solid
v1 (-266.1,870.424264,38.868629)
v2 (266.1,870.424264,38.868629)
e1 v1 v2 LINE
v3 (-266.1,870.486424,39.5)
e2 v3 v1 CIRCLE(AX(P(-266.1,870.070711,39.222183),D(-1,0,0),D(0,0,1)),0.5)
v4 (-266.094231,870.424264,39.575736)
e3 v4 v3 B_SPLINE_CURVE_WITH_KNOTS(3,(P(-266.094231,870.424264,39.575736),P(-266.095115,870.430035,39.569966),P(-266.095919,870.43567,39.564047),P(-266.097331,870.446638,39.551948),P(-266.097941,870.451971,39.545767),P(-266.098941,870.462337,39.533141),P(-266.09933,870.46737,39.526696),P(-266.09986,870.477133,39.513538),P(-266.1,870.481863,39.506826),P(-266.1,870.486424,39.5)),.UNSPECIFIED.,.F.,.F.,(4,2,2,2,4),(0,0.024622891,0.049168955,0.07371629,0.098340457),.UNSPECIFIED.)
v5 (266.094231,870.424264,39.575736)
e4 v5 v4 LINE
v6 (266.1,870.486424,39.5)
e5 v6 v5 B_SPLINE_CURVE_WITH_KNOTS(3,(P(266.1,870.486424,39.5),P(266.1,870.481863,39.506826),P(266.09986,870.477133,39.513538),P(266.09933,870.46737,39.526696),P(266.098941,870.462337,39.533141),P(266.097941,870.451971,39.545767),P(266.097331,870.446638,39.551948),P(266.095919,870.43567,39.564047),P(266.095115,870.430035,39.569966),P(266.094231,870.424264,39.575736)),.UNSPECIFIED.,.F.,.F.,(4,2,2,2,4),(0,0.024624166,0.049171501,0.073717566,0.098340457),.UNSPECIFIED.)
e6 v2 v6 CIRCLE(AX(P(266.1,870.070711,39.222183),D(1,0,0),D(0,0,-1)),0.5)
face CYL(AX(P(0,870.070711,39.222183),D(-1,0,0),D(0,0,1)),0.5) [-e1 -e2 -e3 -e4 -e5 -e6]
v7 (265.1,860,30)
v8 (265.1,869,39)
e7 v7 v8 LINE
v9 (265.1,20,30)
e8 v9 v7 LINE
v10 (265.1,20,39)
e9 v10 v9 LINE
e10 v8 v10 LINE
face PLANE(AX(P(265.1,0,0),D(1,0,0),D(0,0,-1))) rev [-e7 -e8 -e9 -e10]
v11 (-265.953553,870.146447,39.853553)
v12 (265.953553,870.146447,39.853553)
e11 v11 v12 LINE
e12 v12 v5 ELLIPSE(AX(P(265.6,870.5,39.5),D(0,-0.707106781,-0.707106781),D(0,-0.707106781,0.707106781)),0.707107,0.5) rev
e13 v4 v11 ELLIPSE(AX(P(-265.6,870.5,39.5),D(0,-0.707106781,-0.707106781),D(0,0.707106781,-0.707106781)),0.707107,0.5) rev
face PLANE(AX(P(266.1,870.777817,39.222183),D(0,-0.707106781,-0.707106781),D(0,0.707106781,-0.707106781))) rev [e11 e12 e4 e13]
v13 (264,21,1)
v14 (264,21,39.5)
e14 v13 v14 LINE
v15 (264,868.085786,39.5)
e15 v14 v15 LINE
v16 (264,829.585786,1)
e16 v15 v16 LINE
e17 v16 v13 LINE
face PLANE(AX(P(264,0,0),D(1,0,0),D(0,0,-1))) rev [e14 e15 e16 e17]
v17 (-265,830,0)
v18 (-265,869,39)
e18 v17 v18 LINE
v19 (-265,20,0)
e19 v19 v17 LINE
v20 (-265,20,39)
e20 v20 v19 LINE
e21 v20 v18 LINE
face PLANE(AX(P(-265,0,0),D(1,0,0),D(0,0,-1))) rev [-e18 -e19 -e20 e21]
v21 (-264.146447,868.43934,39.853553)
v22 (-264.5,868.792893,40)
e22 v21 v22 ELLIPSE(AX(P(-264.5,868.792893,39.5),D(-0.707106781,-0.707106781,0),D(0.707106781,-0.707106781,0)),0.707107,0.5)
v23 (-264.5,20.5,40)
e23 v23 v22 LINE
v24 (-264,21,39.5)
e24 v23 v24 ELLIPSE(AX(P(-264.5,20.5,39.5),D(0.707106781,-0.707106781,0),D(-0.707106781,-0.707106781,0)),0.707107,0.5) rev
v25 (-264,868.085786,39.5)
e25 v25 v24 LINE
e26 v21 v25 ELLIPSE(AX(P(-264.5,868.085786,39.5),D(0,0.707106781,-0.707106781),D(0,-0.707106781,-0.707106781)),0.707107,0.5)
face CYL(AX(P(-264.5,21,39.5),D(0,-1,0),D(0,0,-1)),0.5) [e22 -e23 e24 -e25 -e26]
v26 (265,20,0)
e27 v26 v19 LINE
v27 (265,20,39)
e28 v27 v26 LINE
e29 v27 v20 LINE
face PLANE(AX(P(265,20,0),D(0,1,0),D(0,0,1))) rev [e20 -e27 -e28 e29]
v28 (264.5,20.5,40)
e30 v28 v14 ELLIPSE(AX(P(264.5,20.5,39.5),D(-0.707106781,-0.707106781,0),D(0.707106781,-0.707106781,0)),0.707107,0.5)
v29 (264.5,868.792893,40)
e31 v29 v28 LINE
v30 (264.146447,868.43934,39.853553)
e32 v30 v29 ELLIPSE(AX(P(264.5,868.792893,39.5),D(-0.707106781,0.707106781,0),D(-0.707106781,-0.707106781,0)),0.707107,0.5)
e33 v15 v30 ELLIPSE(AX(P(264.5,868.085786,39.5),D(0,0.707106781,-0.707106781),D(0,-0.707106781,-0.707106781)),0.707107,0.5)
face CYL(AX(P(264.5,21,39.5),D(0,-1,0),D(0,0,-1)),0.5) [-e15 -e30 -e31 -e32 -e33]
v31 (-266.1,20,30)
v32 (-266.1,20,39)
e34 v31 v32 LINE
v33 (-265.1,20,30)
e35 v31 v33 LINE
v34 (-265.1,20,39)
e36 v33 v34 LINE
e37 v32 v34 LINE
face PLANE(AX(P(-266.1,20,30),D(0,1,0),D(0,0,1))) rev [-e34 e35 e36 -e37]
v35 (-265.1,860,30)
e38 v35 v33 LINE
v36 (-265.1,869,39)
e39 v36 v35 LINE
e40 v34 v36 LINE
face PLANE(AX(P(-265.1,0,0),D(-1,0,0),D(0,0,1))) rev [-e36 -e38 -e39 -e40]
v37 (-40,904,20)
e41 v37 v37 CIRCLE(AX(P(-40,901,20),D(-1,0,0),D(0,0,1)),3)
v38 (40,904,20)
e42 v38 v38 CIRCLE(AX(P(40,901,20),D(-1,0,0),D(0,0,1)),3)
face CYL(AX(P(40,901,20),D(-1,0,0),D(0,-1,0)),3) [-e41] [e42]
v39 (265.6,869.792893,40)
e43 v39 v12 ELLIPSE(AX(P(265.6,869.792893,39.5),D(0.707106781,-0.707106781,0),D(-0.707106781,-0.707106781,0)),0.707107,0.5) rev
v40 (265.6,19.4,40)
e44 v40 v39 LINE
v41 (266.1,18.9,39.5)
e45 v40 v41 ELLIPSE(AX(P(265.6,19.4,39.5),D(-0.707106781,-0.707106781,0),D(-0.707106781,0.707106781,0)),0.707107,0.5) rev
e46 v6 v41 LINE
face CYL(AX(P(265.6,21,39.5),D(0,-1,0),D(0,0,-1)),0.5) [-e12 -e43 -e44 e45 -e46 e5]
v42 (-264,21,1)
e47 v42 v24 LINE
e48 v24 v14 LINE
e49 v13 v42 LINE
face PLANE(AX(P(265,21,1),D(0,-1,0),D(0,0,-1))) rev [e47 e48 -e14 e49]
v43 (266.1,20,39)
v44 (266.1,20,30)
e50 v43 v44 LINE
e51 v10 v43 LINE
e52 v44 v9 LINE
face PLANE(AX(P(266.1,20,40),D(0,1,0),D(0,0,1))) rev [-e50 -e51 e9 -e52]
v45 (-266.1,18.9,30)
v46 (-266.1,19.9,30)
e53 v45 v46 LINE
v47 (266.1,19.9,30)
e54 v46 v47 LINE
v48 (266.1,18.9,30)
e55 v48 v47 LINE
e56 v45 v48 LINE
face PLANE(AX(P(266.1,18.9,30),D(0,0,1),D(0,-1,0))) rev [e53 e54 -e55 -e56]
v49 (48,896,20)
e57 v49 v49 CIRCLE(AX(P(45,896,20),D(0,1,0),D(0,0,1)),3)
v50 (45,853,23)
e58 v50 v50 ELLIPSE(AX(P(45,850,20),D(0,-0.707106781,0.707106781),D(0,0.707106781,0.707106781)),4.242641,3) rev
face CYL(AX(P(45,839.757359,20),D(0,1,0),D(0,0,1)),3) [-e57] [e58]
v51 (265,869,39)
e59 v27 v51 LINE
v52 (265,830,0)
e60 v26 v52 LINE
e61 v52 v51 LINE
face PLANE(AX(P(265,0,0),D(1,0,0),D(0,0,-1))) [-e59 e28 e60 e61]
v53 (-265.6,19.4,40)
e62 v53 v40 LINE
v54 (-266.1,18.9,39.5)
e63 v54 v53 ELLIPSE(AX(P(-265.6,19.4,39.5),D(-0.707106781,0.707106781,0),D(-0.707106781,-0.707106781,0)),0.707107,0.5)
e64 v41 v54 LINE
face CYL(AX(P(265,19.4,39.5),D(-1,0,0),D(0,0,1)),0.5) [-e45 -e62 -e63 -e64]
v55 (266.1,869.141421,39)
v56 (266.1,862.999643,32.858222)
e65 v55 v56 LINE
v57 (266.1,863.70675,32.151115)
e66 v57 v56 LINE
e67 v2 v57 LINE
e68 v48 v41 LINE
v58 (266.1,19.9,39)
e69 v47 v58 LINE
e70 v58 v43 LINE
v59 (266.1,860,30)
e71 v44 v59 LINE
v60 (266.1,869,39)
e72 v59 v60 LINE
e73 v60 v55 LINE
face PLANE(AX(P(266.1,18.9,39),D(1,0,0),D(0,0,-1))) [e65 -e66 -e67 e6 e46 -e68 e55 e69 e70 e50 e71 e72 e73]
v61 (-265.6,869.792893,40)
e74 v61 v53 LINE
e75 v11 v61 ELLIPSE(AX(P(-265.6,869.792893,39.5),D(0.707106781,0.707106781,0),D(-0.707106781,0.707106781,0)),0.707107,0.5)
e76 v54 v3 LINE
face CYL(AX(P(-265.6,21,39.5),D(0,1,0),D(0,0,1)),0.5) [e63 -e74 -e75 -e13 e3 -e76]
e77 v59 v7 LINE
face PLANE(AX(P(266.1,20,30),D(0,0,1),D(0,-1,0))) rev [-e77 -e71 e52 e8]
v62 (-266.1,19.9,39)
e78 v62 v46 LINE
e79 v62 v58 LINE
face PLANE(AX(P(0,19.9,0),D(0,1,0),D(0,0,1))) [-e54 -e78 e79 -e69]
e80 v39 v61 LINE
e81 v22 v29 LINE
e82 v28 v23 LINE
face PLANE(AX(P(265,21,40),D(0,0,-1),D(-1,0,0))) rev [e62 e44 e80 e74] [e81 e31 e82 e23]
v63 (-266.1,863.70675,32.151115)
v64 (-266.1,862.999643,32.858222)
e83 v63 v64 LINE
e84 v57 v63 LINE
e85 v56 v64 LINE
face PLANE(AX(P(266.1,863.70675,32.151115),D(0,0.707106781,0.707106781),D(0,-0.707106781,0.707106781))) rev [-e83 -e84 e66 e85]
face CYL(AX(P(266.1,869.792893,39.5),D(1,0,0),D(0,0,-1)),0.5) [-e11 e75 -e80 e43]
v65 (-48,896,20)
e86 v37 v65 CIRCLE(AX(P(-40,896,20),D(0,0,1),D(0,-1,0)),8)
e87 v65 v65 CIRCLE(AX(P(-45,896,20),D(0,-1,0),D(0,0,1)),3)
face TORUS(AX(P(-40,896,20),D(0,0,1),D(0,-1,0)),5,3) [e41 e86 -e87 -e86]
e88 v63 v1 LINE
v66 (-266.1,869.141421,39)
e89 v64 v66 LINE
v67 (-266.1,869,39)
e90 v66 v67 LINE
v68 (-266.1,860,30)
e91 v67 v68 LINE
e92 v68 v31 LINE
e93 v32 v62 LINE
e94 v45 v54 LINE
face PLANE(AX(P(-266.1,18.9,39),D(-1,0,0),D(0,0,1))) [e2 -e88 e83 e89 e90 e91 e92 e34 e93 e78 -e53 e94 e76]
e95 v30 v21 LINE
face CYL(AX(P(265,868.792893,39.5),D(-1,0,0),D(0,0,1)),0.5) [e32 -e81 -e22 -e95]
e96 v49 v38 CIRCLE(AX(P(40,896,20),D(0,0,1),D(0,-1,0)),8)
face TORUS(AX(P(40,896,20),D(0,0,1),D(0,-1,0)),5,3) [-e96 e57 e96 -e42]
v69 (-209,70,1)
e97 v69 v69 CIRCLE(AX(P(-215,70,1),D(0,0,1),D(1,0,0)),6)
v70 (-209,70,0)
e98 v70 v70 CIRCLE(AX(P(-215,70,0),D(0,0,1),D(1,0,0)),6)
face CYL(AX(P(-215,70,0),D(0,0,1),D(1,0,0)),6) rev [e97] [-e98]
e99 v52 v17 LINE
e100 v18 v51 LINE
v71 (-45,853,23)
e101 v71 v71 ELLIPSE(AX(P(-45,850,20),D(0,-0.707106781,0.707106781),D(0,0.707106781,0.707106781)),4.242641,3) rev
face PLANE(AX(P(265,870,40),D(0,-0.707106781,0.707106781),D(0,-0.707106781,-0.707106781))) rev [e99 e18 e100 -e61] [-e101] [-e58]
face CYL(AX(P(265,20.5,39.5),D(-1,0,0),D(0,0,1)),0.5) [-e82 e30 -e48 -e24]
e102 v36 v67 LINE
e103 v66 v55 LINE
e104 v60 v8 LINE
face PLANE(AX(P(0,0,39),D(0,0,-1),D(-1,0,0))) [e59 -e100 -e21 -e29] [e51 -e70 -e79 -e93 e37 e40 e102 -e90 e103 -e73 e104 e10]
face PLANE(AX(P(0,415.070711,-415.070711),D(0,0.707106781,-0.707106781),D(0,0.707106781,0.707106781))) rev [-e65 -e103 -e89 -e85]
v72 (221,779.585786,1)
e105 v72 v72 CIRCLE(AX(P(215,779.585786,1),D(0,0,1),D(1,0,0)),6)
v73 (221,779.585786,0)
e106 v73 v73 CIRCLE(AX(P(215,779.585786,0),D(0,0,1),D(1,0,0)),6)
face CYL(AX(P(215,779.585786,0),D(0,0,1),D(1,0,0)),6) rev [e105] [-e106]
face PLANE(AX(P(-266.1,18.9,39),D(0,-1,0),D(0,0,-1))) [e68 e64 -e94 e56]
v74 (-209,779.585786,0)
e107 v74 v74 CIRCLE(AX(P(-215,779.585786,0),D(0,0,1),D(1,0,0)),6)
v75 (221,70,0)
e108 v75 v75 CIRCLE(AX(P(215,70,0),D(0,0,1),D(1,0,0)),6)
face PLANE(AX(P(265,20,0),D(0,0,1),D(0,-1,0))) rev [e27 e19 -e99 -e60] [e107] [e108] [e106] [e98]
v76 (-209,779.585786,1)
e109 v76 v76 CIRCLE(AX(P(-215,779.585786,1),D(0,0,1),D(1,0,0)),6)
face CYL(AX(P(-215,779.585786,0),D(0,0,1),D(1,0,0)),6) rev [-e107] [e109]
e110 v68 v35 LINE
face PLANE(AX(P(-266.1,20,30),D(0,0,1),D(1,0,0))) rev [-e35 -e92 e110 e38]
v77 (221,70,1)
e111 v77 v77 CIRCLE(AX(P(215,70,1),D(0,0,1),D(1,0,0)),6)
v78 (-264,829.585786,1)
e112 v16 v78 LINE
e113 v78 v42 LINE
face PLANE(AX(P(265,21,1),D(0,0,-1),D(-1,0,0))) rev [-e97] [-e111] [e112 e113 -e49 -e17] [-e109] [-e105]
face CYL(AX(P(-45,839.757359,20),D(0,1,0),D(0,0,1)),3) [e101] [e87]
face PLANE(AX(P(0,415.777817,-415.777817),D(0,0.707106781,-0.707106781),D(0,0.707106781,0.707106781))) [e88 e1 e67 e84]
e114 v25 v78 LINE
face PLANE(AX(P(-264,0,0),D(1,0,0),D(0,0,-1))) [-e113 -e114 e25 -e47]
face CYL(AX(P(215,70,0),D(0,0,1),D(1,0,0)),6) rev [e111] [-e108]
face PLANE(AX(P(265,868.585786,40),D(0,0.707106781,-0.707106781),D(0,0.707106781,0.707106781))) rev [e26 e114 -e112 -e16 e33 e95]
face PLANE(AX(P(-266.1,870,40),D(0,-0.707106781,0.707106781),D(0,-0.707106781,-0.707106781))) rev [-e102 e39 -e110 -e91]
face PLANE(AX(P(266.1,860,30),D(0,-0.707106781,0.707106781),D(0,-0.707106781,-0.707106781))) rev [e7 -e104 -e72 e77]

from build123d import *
from build123d.topology import SkipClean

# Parameters (mm, degrees)
BOSS_EXTRUDE1_DEPTH  = 265
BOSS_EXTRUDE2_DEPTH  = 1
BOSS_EXTRUDE3_DEPTH  = 1
SKETCH5_R            = 6
CUT_EXTRUDE1_DEPTH   = 1
BOSS_EXTRUDE5_REACH  = 913.299
SKETCH6_R            = 3
SKETCH10_R           = 3
BOSS_EXTRUDE7_DEPTH  = 1
BOSS_EXTRUDE8_DEPTH  = 1
SKETCH16_W           = 532.2
SKETCH16_H           = 10
BOSS_EXTRUDE9_DEPTH  = 1
SKETCH18_W           = 532.2
SKETCH18_H           = 10
BOSS_EXTRUDE10_DEPTH = 1
SKETCH19_W           = 532.2
SKETCH19_H           = 851.170710678
SKETCH19_W_2         = 528
SKETCH19_H_2         = 847.585786438
BOSS_EXTRUDE11_DEPTH = 1
CUT_EXTRUDE2_DEPTH   = 532.2
FILLET1_R            = 0.5
FILLET2_START        = -267
FILLET2_DEPTH        = 534


with BuildPart() as part:
    # Sketch2 → Boss-Extrude1 (new, symmetric)
    with BuildSketch(Plane(origin=(0, 0, 0), x_dir=(0, 0, -1), z_dir=(1, 0, 0))):
        Polygon((0, 20), (-40, 20), (-40, 21), (-1, 21), (-1, 829.585786438), (-40, 868.585786438), (-40, 870), (0, 830), align=None)
    extrude(amount=BOSS_EXTRUDE1_DEPTH, both=True)

    # Sketch3 → Boss-Extrude2 (add)
    with BuildSketch(Plane(origin=(265, 0, 0), x_dir=(0, 0, -1), z_dir=(1, 0, 0))):
        Polygon((-40, 870), (0, 830), (0, 20), (-40, 20), align=None)
    extrude(amount=-BOSS_EXTRUDE2_DEPTH)

    # Sketch4 → Boss-Extrude3 (add)
    with BuildSketch(Plane.ZY.offset(265)):
        Polygon((40, 870), (0, 830), (0, 20), (40, 20), align=None)
    extrude(amount=-BOSS_EXTRUDE3_DEPTH)

    # Sketch5 → Cut-Extrude1 (cut)
    with BuildSketch(Plane.XY.offset(1)):
        with Locations((215, 779.585786438)):
            Circle(SKETCH5_R)
        with Locations((215, 70)):
            Circle(SKETCH5_R)
        with Locations((-215, 779.585786438)):
            Circle(SKETCH5_R)
        with Locations((-215, 70)):
            Circle(SKETCH5_R)
    extrude(amount=-CUT_EXTRUDE1_DEPTH, mode=Mode.SUBTRACT)

    # Boss-Extrude5: up to this plane
    boss_extrude5_end = Plane(origin=(265, 870, 40), z_dir=(0, -0.7071067811865444, 0.7071067811865508))
    # Sketch6 → Boss-Extrude5 (add, up to the surface)
    with BuildSketch(Plane(origin=(0, 891, 0), x_dir=(1, 0, 0), z_dir=(0, 1, 0)), mode=Mode.PRIVATE) as boss_extrude5_sk1:
        with Locations(Location((-45, -20, 0), (0, 0, 270))):
            Circle(SKETCH6_R)
    boss_extrude5_tool1 = split(extrude(boss_extrude5_sk1.sketch, amount=-BOSS_EXTRUDE5_REACH, mode=Mode.PRIVATE), bisect_by=boss_extrude5_end, keep=Keep.BOTH, mode=Mode.PRIVATE)
    add(boss_extrude5_tool1.solids().sort_by_distance((-45, 891, 20))[0])
    # Sketch6 → Boss-Extrude5 (add, up to the surface)
    with BuildSketch(Plane(origin=(0, 891, 0), x_dir=(1, 0, 0), z_dir=(0, 1, 0)), mode=Mode.PRIVATE) as boss_extrude5_sk2:
        with Locations(Location((45, -20, 0), (0, 0, 270))):
            Circle(SKETCH6_R)
    boss_extrude5_tool2 = split(extrude(boss_extrude5_sk2.sketch, amount=-BOSS_EXTRUDE5_REACH, mode=Mode.PRIVATE), bisect_by=boss_extrude5_end, keep=Keep.BOTH, mode=Mode.PRIVATE)
    add(boss_extrude5_tool2.solids().sort_by_distance((45, 891, 20))[0])

    # Sweep1: sweep along a path in Sketch9
    with SkipClean():  # the faces are left unmerged after this step: merging them gives an invalid solid
        with BuildLine(Plane(origin=(0, 0, 20), x_dir=(-1, 0, 0), z_dir=(0, 0, -1))) as sweep1_path:
            Line((-45, 891), (-45, 896))
            ThreePointArc((-45, 896), (-43.535533906, 899.535533906), (-40, 901))
            Line((-40, 901), (40, 901))
            ThreePointArc((40, 901), (43.535533906, 899.535533906), (45, 896))
            Line((45, 896), (45, 891))
        # Sketch10 → Sweep1 (sweep)
        with BuildSketch(Plane(origin=(0, 891, 0), x_dir=(1, 0, 0), z_dir=(0, 1, 0))):
            with Locations((45, -20)):
                Circle(SKETCH10_R)
        sweep(path=sweep1_path.line)



with BuildPart() as body_2:
    # Sketch13 → Boss-Extrude7 (new body)
    with BuildSketch(Plane(origin=(265.1, 0, 0), x_dir=(0, 0, -1), z_dir=(1, 0, 0))):
        Polygon((-30, 20), (-30, 860), (-40, 870), (-40, 20), align=None)
    extrude(amount=BOSS_EXTRUDE7_DEPTH)


with BuildPart() as body_3:
    # Sketch15 → Boss-Extrude8 (new body)
    with BuildSketch(Plane.ZY.offset(265.1)):
        Polygon((30, 20), (30, 860), (40, 870), (40, 20), align=None)
    extrude(amount=BOSS_EXTRUDE8_DEPTH)


with BuildPart() as body_4:
    # Sketch16 → Boss-Extrude9 (new body)
    with BuildSketch(Plane(origin=(0, 19.9, 0), x_dir=(-1, 0, 0), z_dir=(0, -1, 0))):
        with Locations((0, -35)):
            Rectangle(SKETCH16_W, SKETCH16_H)
    extrude(amount=BOSS_EXTRUDE9_DEPTH)


with BuildPart() as body_5:
    # Sketch18 → Boss-Extrude10 (new body)
    with BuildSketch(Plane(origin=(0, 415.070710678, -415.070710678), x_dir=(-1, 0, 0), z_dir=(0, 0.7071067811865445, -0.7071067811865507))):
        with Locations((0, 638.46717088)):
            Rectangle(SKETCH18_W, SKETCH18_H)
    extrude(amount=BOSS_EXTRUDE10_DEPTH)


with BuildPart() as part_1:
    with SkipClean():  # the faces are left unmerged after this step: merging them gives an invalid solid
        add(part.part)

        add(body_2.part)  # Boss-Extrude11 merges body 2

        add(body_3.part)  # Boss-Extrude11 merges body 3

        add(body_4.part)  # Boss-Extrude11 merges body 4

        add(body_5.part)  # Boss-Extrude11 merges body 5
        # Sketch19 → Boss-Extrude11 (add)
        with BuildSketch(Plane.XY.offset(40)):
            with Locations((0, 444.485355339)):
                Rectangle(SKETCH19_W, SKETCH19_H)
            with Locations((0, 444.792893219)):
                Rectangle(SKETCH19_W_2, SKETCH19_H_2, mode=Mode.SUBTRACT)
        extrude(amount=-BOSS_EXTRUDE11_DEPTH)

    # Sketch20 → Cut-Extrude2 (cut)
    with SkipClean():  # the faces are left unmerged after this step: merging them gives an invalid solid
        with BuildSketch(Plane(origin=(266.1, 0, 0), x_dir=(0, 0, -1), z_dir=(1, 0, 0))):
            Polygon((-39.929289322, 870.070710678), (-40, 870), (-40, 870.070710678), align=None)
        extrude(amount=-CUT_EXTRUDE2_DEPTH, mode=Mode.SUBTRACT)

    # Fillet1
    # the kernel refuses this fillet: 0.5 mm, written as the material it takes off along each edge
    with BuildSketch(Plane(origin=(267.35, 18.9, 40), x_dir=(0, 1, 0), z_dir=(-1, 0, 0))) as fillet1_piece_1:
        with BuildLine():
            CenterArc((FILLET1_R, FILLET1_R), FILLET1_R, 180, 90)
            Line((0, FILLET1_R), (0, 0))
            Line((0, 0), (FILLET1_R, 0))
        make_face()
    extrude(amount=534.7, mode=Mode.SUBTRACT)
    with BuildSketch(Plane(origin=(266.1, 871.25, 40), x_dir=(0, 0, -1), z_dir=(0, -1, 0))) as fillet1_piece_2:
        with BuildLine():
            CenterArc((FILLET1_R, -FILLET1_R), FILLET1_R, 90, 90)
            Line((0, -FILLET1_R), (0, 0))
            Line((0, 0), (FILLET1_R, 0))
        make_face()
    extrude(amount=851.25, mode=Mode.SUBTRACT)
    with BuildSketch(Plane(origin=(-266.1, 871.25, 40), x_dir=(0, 0, -1), z_dir=(0, -1, 0))) as fillet1_piece_3:
        with BuildLine():
            CenterArc((FILLET1_R, FILLET1_R), FILLET1_R, 180, 90)
            Line((0, FILLET1_R), (0, 0))
            Line((0, 0), (FILLET1_R, 0))
        make_face()
    extrude(amount=851.25, mode=Mode.SUBTRACT)
    with BuildSketch(Plane(origin=(265, 870, 40), x_dir=(0, 0.7071067811869935, -0.7071067811861015), z_dir=(-1, 0, 0))) as fillet1_piece_4:
        with BuildLine():
            CenterArc((FILLET1_R * 0.414213562373, FILLET1_R), FILLET1_R, 225, 45)
            Line((-FILLET1_R * 0.292893218814, FILLET1_R * 0.292893218813), (0, 0))
            Line((0, 0), (FILLET1_R * 0.414213562373, 0))
        make_face()
    extrude(amount=530, mode=Mode.SUBTRACT)
    with BuildSketch(Plane(origin=(264, 21, 40), x_dir=(0, -1, 0), z_dir=(-1, 0, 0))) as fillet1_piece_5:
        with BuildLine():
            CenterArc((FILLET1_R, -FILLET1_R), FILLET1_R, 90, 90)
            Line((0, -FILLET1_R), (0, 0))
            Line((0, 0), (FILLET1_R, 0))
        make_face()
    extrude(amount=528, mode=Mode.SUBTRACT)
    with BuildSketch(Plane(origin=(264, 868.585786438, 40), x_dir=(0, -0.7071067811865132, -0.7071067811865818), z_dir=(-1, 0, 0))) as fillet1_piece_6:
        with BuildLine():
            CenterArc((FILLET1_R * 0.414213562373, -FILLET1_R), FILLET1_R, 90, 45)
            Line((-FILLET1_R * 0.292893218813, -FILLET1_R * 0.292893218813), (0, 0))
            Line((0, 0), (FILLET1_R * 0.414213562373, 0))
        make_face()
    extrude(amount=528, mode=Mode.SUBTRACT)
    with BuildSketch(Plane(origin=(264, 21, 40), x_dir=(1, 0, 0), z_dir=(0, 1, 0))) as fillet1_piece_7_section:
        with BuildLine():
            CenterArc((FILLET1_R, FILLET1_R), FILLET1_R, 180, 90)
            Line((0, FILLET1_R), (0, 0))
            Line((0, 0), (FILLET1_R, 0))
        make_face()
    fillet1_piece_7 = extrude(amount=848.835786438, mode=Mode.PRIVATE)
    fillet1_piece_7 = split(fillet1_piece_7, bisect_by=Plane(origin=(264, 444.792893219, -383.792893219), z_dir=(0, -0.7071067811865426, 0.7071067811865525)), keep=Keep.TOP, mode=Mode.PRIVATE)
    add(fillet1_piece_7, mode=Mode.SUBTRACT)
    with BuildSketch(Plane(origin=(-264, 21, 40), x_dir=(-1, 0, 0), z_dir=(0, 1, 0))) as fillet1_piece_8_section:
        with BuildLine():
            CenterArc((FILLET1_R, -FILLET1_R), FILLET1_R, 90, 90)
            Line((0, -FILLET1_R), (0, 0))
            Line((0, 0), (FILLET1_R, 0))
        make_face()
    fillet1_piece_8 = extrude(amount=848.835786438, mode=Mode.PRIVATE)
    fillet1_piece_8 = split(fillet1_piece_8, bisect_by=Plane(origin=(-264, 444.792893219, -383.792893219), z_dir=(0, -0.7071067811865426, 0.7071067811865525)), keep=Keep.TOP, mode=Mode.PRIVATE)
    add(fillet1_piece_8, mode=Mode.SUBTRACT)
    with BuildSketch(Plane(origin=(265.1, 870, 40), x_dir=(0, -1, 0), z_dir=(-1, 0, 0)), Plane(origin=(-265, 870, 40), x_dir=(0, -1, 0), z_dir=(-1, 0, 0))) as fillet1_piece_9:
        with BuildLine():
            CenterArc((FILLET1_R * 0.414213562373, -FILLET1_R), FILLET1_R, 90, 45)
            Line((-FILLET1_R * 0.292893218814, -FILLET1_R * 0.292893218814), (0, 0))
            Line((0, 0), (FILLET1_R * 0.414213562373, 0))
        make_face()
    extrude(amount=0.1, mode=Mode.SUBTRACT)
    with BuildSketch(Plane(origin=(-265.1, 870, 40), x_dir=(0, 0.7071067811869935, -0.7071067811861015), z_dir=(-1, 0, 0))) as fillet1_piece_10:
        with BuildLine():
            CenterArc((FILLET1_R * 0.414213562373, FILLET1_R), FILLET1_R, 225, 45)
            Line((-FILLET1_R * 0.292893218814, FILLET1_R * 0.292893218813), (0, 0))
            Line((0, 0), (FILLET1_R * 0.414213562373, 0))
        make_face()
    extrude(amount=1.517766953, mode=Mode.SUBTRACT)
    with BuildSketch(Plane(origin=(265.1, 870, 40), x_dir=(0, 0.7071067811869935, -0.7071067811861015), z_dir=(1, 0, 0))) as fillet1_piece_11:
        with BuildLine():
            CenterArc((FILLET1_R * 0.414213562373, -FILLET1_R), FILLET1_R, 90, 45)
            Line((-FILLET1_R * 0.292893218814, -FILLET1_R * 0.292893218813), (0, 0))
            Line((0, 0), (FILLET1_R * 0.414213562373, 0))
        make_face()
    extrude(amount=1.517766953, mode=Mode.SUBTRACT)
    with BuildSketch(Plane(origin=(-266.1, 20, 40), x_dir=(0, 0, -1), z_dir=(0, -1, 0)), Plane(origin=(266.1, 19.9, 40), x_dir=(0, 0, -1), z_dir=(0, 1, 0))) as fillet1_piece_12:
        with BuildLine():
            CenterArc((FILLET1_R, FILLET1_R), FILLET1_R, 180, 90)
            Line((0, FILLET1_R), (0, 0))
            Line((0, 0), (FILLET1_R, 0))
        make_face()
    extrude(amount=0.1, mode=Mode.SUBTRACT)
    with BuildSketch(Plane(origin=(-266.1, 19.9, 40), x_dir=(0, 0, -1), z_dir=(0, -1, 0))) as fillet1_piece_13:
        with BuildLine():
            CenterArc((FILLET1_R, FILLET1_R), FILLET1_R, 180, 90)
            Line((0, FILLET1_R), (0, 0))
            Line((0, 0), (FILLET1_R, 0))
        make_face()
    extrude(amount=2.25, mode=Mode.SUBTRACT)
    with BuildSketch(Plane(origin=(266.1, 19.9, 40), x_dir=(0, 0, -1), z_dir=(0, -1, 0))) as fillet1_piece_14:
        with BuildLine():
            CenterArc((FILLET1_R, -FILLET1_R), FILLET1_R, 90, 90)
            Line((0, -FILLET1_R), (0, 0))
            Line((0, 0), (FILLET1_R, 0))
        make_face()
    extrude(amount=2.25, mode=Mode.SUBTRACT)
    with BuildSketch(Plane(origin=(265.25, 21, 40), x_dir=(0, -1, 0), z_dir=(-1, 0, 0))) as fillet1_piece_15a_section:
        with BuildLine():
            CenterArc((FILLET1_R, -FILLET1_R), FILLET1_R, 90, 90)
            Line((0, -FILLET1_R), (0, 0))
            Line((0, 0), (FILLET1_R, 0))
        make_face()
    fillet1_piece_15a = extrude(amount=529.25, mode=Mode.PRIVATE)
    fillet1_piece_15a = split(fillet1_piece_15a, bisect_by=Plane(origin=(264, 21, 40), z_dir=(1, 0, 0)), keep=Keep.TOP, mode=Mode.PRIVATE)
    with BuildSketch(Plane(origin=(264, 19.75, 40), x_dir=(1, 0, 0), z_dir=(0, 1, 0))) as fillet1_piece_15b_section:
        with BuildLine():
            CenterArc((FILLET1_R, FILLET1_R), FILLET1_R, 180, 90)
            Line((0, FILLET1_R), (0, 0))
            Line((0, 0), (FILLET1_R, 0))
        make_face()
    fillet1_piece_15b = extrude(amount=850.085786438, mode=Mode.PRIVATE)
    fillet1_piece_15b = split(fillet1_piece_15b, bisect_by=Plane(origin=(264, 21, 40), z_dir=(0, -1, 0)), keep=Keep.TOP, mode=Mode.PRIVATE)
    fillet1_piece_15 = fillet1_piece_15a & fillet1_piece_15b
    add(fillet1_piece_15, mode=Mode.SUBTRACT)
    with BuildSketch(Plane(origin=(-264, 19.75, 40), x_dir=(-1, 0, 0), z_dir=(0, 1, 0))) as fillet1_piece_16a_section:
        with BuildLine():
            CenterArc((FILLET1_R, -FILLET1_R), FILLET1_R, 90, 90)
            Line((0, -FILLET1_R), (0, 0))
            Line((0, 0), (FILLET1_R, 0))
        make_face()
    fillet1_piece_16a = extrude(amount=850.085786438, mode=Mode.PRIVATE)
    fillet1_piece_16a = split(fillet1_piece_16a, bisect_by=Plane(origin=(-264, 21, 40), z_dir=(0, -1, 0)), keep=Keep.TOP, mode=Mode.PRIVATE)
    with BuildSketch(Plane(origin=(264, 21, 40), x_dir=(0, -1, 0), z_dir=(-1, 0, 0))) as fillet1_piece_16b_section:
        with BuildLine():
            CenterArc((FILLET1_R, -FILLET1_R), FILLET1_R, 90, 90)
            Line((0, -FILLET1_R), (0, 0))
            Line((0, 0), (FILLET1_R, 0))
        make_face()
    fillet1_piece_16b = extrude(amount=529.25, mode=Mode.PRIVATE)
    fillet1_piece_16b = split(fillet1_piece_16b, bisect_by=Plane(origin=(-264, 21, 40), z_dir=(-1, 0, 0)), keep=Keep.TOP, mode=Mode.PRIVATE)
    fillet1_piece_16 = fillet1_piece_16a & fillet1_piece_16b
    add(fillet1_piece_16, mode=Mode.SUBTRACT)
    with BuildSketch(Plane(origin=(264.517766953, 868.585786438, 40), x_dir=(0, -0.7071067811865132, -0.7071067811865818), z_dir=(-1, 0, 0))) as fillet1_piece_17a_section:
        with BuildLine():
            CenterArc((FILLET1_R * 0.414213562373, -FILLET1_R), FILLET1_R, 90, 45)
            Line((-FILLET1_R * 0.292893218813, -FILLET1_R * 0.292893218813), (0, 0))
            Line((0, 0), (FILLET1_R * 0.414213562373, 0))
        make_face()
    fillet1_piece_17a = extrude(amount=528.517766953, mode=Mode.PRIVATE)
    fillet1_piece_17a = split(fillet1_piece_17a, bisect_by=Plane(origin=(264, 868.585786438, 40), z_dir=(1, 0, 0)), keep=Keep.TOP, mode=Mode.PRIVATE)
    with BuildSketch(Plane(origin=(264, 21, 40), x_dir=(1, 0, 0), z_dir=(0, 1, 0))) as fillet1_piece_17b_section:
        with BuildLine():
            CenterArc((FILLET1_R, FILLET1_R), FILLET1_R, 180, 90)
            Line((0, FILLET1_R), (0, 0))
            Line((0, 0), (FILLET1_R, 0))
        make_face()
    fillet1_piece_17b = extrude(amount=848.835786438, mode=Mode.PRIVATE)
    fillet1_piece_17b = split(fillet1_piece_17b, bisect_by=Plane(origin=(264, 444.792893219, -383.792893219), z_dir=(0, 0.7071067811865426, -0.7071067811865525)), keep=Keep.TOP, mode=Mode.PRIVATE)
    fillet1_piece_17 = fillet1_piece_17a & fillet1_piece_17b
    add(fillet1_piece_17, mode=Mode.SUBTRACT)
    with BuildSketch(Plane(origin=(264, 868.585786438, 40), x_dir=(0, -0.7071067811865132, -0.7071067811865818), z_dir=(-1, 0, 0))) as fillet1_piece_18a_section:
        with BuildLine():
            CenterArc((FILLET1_R * 0.414213562373, -FILLET1_R), FILLET1_R, 90, 45)
            Line((-FILLET1_R * 0.292893218813, -FILLET1_R * 0.292893218813), (0, 0))
            Line((0, 0), (FILLET1_R * 0.414213562373, 0))
        make_face()
    fillet1_piece_18a = extrude(amount=528.517766953, mode=Mode.PRIVATE)
    fillet1_piece_18a = split(fillet1_piece_18a, bisect_by=Plane(origin=(-264, 868.585786438, 40), z_dir=(-1, 0, 0)), keep=Keep.TOP, mode=Mode.PRIVATE)
    with BuildSketch(Plane(origin=(-264, 21, 40), x_dir=(-1, 0, 0), z_dir=(0, 1, 0))) as fillet1_piece_18b_section:
        with BuildLine():
            CenterArc((FILLET1_R, -FILLET1_R), FILLET1_R, 90, 90)
            Line((0, -FILLET1_R), (0, 0))
            Line((0, 0), (FILLET1_R, 0))
        make_face()
    fillet1_piece_18b = extrude(amount=848.835786438, mode=Mode.PRIVATE)
    fillet1_piece_18b = split(fillet1_piece_18b, bisect_by=Plane(origin=(-264, 444.792893219, -383.792893219), z_dir=(0, 0.7071067811865426, -0.7071067811865525)), keep=Keep.TOP, mode=Mode.PRIVATE)
    fillet1_piece_18 = fillet1_piece_18a & fillet1_piece_18b
    add(fillet1_piece_18, mode=Mode.SUBTRACT)

    # Fillet2: read off the stored shape, not the designer's step
    # Fillet2 outline → Fillet2 (cut)
    with SkipClean():  # the faces are left unmerged after this step: merging them gives an invalid solid
        with BuildSketch(Plane.YZ.offset(FILLET2_START)):
            with BuildLine():
                Line((870.777817459, 39.222182541), (870.424264069, 39.575735931))
                ThreePointArc((870.424264069, 39.575735931), (870.570710678, 39.22218254), (870.424264069, 38.86862915))
                Line((870.424264069, 38.86862915), (870.777817459, 39.222182541))
            make_face()
        extrude(amount=FILLET2_DEPTH, mode=Mode.SUBTRACT)
    add(part_1.part.scale(1), mode=Mode.REPLACE)  # the faces are merged on a copy


solid = part_1.part
